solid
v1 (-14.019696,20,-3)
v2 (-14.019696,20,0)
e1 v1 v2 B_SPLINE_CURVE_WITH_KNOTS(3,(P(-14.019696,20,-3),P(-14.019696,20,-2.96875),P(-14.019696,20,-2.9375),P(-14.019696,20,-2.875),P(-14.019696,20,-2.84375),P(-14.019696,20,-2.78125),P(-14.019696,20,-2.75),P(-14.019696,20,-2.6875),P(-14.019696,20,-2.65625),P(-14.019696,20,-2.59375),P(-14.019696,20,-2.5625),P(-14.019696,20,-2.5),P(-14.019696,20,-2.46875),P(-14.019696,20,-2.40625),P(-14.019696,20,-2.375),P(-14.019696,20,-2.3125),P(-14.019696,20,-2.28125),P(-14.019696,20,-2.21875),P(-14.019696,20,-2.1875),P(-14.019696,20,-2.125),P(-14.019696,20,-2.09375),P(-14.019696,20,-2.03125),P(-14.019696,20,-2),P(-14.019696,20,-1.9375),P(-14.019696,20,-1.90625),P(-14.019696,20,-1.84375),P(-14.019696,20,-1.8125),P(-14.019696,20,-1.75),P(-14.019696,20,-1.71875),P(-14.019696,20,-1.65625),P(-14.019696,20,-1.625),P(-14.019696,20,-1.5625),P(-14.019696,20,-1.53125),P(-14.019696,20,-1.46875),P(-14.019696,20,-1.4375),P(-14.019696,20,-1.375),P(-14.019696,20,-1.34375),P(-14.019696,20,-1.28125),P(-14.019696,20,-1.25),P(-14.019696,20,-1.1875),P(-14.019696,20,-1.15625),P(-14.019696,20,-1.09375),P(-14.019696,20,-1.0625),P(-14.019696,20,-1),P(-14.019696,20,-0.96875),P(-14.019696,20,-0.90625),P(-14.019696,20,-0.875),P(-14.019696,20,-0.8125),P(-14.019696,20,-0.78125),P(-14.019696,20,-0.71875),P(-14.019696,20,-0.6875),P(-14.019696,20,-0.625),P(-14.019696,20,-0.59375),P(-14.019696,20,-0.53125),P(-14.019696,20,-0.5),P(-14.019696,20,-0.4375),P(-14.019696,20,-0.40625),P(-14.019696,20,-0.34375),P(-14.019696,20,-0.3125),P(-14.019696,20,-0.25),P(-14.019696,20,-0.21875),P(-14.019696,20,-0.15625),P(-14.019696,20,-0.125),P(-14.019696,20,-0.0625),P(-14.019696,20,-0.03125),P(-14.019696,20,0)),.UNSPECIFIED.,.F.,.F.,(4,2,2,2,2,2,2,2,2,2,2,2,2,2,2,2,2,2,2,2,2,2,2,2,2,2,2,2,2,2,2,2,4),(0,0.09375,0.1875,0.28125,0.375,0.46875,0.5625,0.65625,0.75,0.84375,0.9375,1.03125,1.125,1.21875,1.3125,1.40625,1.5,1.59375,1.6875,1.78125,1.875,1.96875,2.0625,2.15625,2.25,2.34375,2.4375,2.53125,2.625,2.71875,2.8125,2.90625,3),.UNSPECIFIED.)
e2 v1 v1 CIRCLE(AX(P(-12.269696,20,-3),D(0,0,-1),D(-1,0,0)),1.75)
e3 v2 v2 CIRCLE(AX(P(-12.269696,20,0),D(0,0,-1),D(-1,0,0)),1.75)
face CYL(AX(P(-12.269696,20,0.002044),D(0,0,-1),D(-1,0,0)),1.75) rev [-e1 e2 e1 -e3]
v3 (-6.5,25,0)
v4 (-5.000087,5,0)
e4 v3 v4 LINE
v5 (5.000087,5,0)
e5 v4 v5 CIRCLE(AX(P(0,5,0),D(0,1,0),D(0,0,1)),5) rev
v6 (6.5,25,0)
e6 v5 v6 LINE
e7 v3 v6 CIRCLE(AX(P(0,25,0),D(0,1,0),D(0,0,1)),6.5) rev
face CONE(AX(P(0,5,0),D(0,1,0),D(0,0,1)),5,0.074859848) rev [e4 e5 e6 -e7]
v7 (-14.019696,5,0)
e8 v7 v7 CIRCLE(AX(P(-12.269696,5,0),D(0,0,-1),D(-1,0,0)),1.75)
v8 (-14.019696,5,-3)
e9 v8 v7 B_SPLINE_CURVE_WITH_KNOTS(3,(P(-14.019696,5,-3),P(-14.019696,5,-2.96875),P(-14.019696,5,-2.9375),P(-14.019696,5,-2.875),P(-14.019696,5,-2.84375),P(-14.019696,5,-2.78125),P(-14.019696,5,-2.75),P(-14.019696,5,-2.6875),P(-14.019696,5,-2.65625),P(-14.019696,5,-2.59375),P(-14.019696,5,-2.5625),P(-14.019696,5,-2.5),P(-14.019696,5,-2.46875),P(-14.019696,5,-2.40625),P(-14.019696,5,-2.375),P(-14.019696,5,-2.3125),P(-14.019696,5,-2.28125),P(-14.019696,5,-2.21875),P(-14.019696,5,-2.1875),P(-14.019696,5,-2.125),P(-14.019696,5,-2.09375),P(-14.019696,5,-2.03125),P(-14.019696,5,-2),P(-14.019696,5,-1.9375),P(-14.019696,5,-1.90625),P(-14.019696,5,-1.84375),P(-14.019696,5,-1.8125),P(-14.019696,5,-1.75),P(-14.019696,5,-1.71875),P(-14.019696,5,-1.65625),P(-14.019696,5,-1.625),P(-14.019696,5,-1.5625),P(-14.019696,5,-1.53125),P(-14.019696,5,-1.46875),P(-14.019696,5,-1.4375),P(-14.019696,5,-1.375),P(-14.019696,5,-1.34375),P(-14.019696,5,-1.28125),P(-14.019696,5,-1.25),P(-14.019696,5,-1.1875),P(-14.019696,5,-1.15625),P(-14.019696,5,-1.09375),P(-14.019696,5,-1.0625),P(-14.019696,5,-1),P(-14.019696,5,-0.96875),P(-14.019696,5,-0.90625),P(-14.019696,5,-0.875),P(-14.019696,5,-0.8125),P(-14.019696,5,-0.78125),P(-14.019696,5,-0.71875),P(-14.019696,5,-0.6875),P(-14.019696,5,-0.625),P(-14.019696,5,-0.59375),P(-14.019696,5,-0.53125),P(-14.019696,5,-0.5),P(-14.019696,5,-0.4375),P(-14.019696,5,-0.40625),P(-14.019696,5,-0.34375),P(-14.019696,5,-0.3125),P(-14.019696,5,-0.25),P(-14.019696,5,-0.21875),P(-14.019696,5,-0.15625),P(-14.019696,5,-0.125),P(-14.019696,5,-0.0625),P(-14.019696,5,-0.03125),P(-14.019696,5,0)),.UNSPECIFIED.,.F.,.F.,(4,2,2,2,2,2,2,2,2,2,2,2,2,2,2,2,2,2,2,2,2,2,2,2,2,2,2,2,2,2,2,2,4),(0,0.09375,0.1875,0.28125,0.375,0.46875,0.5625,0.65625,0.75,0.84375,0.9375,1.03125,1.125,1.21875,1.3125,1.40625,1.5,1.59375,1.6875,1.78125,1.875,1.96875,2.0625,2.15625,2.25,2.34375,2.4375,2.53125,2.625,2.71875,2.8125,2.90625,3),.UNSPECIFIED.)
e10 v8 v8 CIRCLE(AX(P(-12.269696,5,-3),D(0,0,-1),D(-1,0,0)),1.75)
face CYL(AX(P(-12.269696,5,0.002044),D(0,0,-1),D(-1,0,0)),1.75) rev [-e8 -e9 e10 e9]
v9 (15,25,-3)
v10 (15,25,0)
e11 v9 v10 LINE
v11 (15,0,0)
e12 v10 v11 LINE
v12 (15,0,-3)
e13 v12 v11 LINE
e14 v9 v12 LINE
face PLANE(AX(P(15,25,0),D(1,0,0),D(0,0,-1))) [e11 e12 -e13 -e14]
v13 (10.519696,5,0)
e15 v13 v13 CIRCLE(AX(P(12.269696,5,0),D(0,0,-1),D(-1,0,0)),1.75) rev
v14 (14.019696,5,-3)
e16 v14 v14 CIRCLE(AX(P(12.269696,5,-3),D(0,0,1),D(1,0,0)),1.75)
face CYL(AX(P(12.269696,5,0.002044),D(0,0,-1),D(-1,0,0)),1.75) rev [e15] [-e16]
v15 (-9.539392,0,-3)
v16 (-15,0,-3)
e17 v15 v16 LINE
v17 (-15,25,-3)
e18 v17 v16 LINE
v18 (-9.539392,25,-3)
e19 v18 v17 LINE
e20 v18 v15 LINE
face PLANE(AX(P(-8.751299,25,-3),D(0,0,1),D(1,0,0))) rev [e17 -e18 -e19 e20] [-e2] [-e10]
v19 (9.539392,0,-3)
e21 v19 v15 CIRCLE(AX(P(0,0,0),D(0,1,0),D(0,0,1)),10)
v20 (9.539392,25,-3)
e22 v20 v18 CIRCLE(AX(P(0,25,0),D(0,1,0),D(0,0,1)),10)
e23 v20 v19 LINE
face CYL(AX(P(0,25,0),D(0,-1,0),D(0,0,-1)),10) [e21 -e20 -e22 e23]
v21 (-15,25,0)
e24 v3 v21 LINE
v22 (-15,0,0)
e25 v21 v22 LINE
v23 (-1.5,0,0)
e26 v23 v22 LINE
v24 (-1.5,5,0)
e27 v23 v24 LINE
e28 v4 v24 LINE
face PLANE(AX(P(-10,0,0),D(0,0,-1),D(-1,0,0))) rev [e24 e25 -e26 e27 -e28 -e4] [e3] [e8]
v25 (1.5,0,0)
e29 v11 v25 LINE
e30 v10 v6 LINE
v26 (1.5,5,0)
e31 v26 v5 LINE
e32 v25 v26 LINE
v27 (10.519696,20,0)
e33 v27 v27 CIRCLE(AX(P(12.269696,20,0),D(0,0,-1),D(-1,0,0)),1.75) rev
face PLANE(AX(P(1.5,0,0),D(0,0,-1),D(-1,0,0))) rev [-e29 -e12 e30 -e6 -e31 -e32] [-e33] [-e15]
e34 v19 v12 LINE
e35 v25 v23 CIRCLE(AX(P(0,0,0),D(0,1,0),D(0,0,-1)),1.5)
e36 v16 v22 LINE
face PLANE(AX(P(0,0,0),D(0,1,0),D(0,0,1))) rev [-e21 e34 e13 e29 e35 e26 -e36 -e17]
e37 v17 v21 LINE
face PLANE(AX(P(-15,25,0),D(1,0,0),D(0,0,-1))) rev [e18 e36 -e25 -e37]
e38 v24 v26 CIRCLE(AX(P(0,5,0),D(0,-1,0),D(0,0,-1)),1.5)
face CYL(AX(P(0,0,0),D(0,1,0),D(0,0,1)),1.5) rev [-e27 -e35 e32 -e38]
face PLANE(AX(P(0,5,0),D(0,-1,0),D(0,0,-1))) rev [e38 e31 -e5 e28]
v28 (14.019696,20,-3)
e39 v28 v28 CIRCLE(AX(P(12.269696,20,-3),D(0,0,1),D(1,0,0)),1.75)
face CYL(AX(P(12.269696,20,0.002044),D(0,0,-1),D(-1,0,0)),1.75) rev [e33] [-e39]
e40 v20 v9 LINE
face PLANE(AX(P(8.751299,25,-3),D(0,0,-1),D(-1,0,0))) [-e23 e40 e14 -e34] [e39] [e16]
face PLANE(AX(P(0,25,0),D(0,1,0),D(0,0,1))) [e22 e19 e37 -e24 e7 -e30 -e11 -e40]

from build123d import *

# Parameters (mm, degrees)
SKETCH1_R           = 10
BOSS_EXTRUDE1_DEPTH = 25
SKETCH4_R           = 1.5
BOSS_EXTRUDE2_DEPTH = 20
CUT_EXTRUDE2_DEPTH  = 29.722813233
SKETCH6_W           = 6.24870068
SKETCH6_H           = 3
BOSS_EXTRUDE3_DEPTH = 25
SKETCH7_R           = 1.75
CUT_EXTRUDE3_DEPTH  = 30.983328701


# Read off the part's stored shape, not the designer's step: Boundary-Cut1
with BuildPart() as part:
    # Sketch1 → Boss-Extrude1 (new body)
    with BuildSketch(Plane(origin=(0, 0, 0), x_dir=(1, 0, 0), z_dir=(0, 1, 0))):
        with Locations(Location((0, 0, 0), (0, 0, 270))):
            Circle(SKETCH1_R)
    extrude(amount=BOSS_EXTRUDE1_DEPTH)

    # Boundary-Cut1 outline → Boundary-Cut1 (revolve, cut)
    with BuildSketch(Plane.XY):
        Polygon((0, 5), (5, 5), (6.5, 25), (0, 25), align=None)
    revolve(axis=Axis((0, 0, 0), (0, 1, 0)), mode=Mode.SUBTRACT)

    # Sketch4 → Boss-Extrude2 (add)
    with BuildSketch(Plane(origin=(0, 5, 0), x_dir=(1, 0, 0), z_dir=(0, 1, 0))):
        with Locations(Location((0, 0, 0), (0, 0, 90))):
            Circle(SKETCH4_R)
    extrude(amount=BOSS_EXTRUDE2_DEPTH)

    # Sketch5 → Cut-Extrude2 (cut, through all)
    with BuildSketch(Plane(origin=(0, 25, 0), x_dir=(1, 0, 0), z_dir=(0, 1, 0))):
        with BuildLine():
            Line((-10, 0), (-1.5, 0))
            ThreePointArc((-1.5, 0), (0, 1.5), (1.5, 0))
            Line((1.5, 0), (10, 0))
            ThreePointArc((10, 0), (0, -10), (-10, 0))
        make_face()
    extrude(amount=-CUT_EXTRUDE2_DEPTH, mode=Mode.SUBTRACT)

    # Sketch6 → Boss-Extrude3 (add)
    with BuildSketch(Plane(origin=(0, 0, 0), x_dir=(1, 0, 0), z_dir=(0, 1, 0))):
        with Locations((-11.87564966, 1.5)):
            Rectangle(SKETCH6_W, SKETCH6_H)
    boss_extrude3 = extrude(amount=BOSS_EXTRUDE3_DEPTH)

    # Sketch7 → Cut-Extrude3 (cut, through all)
    with BuildSketch(Plane(origin=(0, 0, -3), x_dir=(-1, 0, 0), z_dir=(0, 0, -1))):
        with Locations((12.269696007, 5)):
            Circle(SKETCH7_R)
        with Locations((12.269696007, 20)):
            Circle(SKETCH7_R)
    cut_extrude3 = extrude(amount=-CUT_EXTRUDE3_DEPTH, mode=Mode.SUBTRACT)

    # Mirror1: Boss-Extrude3, Cut-Extrude3 across plane
    add(boss_extrude3.mirror(Plane(origin=(0, 0, 0), x_dir=(0, 0, 1), z_dir=(1, 0, 0))))
    add(cut_extrude3.mirror(Plane(origin=(0, 0, 0), x_dir=(0, 0, 1), z_dir=(1, 0, 0))), mode=Mode.SUBTRACT)


solid = part.part
